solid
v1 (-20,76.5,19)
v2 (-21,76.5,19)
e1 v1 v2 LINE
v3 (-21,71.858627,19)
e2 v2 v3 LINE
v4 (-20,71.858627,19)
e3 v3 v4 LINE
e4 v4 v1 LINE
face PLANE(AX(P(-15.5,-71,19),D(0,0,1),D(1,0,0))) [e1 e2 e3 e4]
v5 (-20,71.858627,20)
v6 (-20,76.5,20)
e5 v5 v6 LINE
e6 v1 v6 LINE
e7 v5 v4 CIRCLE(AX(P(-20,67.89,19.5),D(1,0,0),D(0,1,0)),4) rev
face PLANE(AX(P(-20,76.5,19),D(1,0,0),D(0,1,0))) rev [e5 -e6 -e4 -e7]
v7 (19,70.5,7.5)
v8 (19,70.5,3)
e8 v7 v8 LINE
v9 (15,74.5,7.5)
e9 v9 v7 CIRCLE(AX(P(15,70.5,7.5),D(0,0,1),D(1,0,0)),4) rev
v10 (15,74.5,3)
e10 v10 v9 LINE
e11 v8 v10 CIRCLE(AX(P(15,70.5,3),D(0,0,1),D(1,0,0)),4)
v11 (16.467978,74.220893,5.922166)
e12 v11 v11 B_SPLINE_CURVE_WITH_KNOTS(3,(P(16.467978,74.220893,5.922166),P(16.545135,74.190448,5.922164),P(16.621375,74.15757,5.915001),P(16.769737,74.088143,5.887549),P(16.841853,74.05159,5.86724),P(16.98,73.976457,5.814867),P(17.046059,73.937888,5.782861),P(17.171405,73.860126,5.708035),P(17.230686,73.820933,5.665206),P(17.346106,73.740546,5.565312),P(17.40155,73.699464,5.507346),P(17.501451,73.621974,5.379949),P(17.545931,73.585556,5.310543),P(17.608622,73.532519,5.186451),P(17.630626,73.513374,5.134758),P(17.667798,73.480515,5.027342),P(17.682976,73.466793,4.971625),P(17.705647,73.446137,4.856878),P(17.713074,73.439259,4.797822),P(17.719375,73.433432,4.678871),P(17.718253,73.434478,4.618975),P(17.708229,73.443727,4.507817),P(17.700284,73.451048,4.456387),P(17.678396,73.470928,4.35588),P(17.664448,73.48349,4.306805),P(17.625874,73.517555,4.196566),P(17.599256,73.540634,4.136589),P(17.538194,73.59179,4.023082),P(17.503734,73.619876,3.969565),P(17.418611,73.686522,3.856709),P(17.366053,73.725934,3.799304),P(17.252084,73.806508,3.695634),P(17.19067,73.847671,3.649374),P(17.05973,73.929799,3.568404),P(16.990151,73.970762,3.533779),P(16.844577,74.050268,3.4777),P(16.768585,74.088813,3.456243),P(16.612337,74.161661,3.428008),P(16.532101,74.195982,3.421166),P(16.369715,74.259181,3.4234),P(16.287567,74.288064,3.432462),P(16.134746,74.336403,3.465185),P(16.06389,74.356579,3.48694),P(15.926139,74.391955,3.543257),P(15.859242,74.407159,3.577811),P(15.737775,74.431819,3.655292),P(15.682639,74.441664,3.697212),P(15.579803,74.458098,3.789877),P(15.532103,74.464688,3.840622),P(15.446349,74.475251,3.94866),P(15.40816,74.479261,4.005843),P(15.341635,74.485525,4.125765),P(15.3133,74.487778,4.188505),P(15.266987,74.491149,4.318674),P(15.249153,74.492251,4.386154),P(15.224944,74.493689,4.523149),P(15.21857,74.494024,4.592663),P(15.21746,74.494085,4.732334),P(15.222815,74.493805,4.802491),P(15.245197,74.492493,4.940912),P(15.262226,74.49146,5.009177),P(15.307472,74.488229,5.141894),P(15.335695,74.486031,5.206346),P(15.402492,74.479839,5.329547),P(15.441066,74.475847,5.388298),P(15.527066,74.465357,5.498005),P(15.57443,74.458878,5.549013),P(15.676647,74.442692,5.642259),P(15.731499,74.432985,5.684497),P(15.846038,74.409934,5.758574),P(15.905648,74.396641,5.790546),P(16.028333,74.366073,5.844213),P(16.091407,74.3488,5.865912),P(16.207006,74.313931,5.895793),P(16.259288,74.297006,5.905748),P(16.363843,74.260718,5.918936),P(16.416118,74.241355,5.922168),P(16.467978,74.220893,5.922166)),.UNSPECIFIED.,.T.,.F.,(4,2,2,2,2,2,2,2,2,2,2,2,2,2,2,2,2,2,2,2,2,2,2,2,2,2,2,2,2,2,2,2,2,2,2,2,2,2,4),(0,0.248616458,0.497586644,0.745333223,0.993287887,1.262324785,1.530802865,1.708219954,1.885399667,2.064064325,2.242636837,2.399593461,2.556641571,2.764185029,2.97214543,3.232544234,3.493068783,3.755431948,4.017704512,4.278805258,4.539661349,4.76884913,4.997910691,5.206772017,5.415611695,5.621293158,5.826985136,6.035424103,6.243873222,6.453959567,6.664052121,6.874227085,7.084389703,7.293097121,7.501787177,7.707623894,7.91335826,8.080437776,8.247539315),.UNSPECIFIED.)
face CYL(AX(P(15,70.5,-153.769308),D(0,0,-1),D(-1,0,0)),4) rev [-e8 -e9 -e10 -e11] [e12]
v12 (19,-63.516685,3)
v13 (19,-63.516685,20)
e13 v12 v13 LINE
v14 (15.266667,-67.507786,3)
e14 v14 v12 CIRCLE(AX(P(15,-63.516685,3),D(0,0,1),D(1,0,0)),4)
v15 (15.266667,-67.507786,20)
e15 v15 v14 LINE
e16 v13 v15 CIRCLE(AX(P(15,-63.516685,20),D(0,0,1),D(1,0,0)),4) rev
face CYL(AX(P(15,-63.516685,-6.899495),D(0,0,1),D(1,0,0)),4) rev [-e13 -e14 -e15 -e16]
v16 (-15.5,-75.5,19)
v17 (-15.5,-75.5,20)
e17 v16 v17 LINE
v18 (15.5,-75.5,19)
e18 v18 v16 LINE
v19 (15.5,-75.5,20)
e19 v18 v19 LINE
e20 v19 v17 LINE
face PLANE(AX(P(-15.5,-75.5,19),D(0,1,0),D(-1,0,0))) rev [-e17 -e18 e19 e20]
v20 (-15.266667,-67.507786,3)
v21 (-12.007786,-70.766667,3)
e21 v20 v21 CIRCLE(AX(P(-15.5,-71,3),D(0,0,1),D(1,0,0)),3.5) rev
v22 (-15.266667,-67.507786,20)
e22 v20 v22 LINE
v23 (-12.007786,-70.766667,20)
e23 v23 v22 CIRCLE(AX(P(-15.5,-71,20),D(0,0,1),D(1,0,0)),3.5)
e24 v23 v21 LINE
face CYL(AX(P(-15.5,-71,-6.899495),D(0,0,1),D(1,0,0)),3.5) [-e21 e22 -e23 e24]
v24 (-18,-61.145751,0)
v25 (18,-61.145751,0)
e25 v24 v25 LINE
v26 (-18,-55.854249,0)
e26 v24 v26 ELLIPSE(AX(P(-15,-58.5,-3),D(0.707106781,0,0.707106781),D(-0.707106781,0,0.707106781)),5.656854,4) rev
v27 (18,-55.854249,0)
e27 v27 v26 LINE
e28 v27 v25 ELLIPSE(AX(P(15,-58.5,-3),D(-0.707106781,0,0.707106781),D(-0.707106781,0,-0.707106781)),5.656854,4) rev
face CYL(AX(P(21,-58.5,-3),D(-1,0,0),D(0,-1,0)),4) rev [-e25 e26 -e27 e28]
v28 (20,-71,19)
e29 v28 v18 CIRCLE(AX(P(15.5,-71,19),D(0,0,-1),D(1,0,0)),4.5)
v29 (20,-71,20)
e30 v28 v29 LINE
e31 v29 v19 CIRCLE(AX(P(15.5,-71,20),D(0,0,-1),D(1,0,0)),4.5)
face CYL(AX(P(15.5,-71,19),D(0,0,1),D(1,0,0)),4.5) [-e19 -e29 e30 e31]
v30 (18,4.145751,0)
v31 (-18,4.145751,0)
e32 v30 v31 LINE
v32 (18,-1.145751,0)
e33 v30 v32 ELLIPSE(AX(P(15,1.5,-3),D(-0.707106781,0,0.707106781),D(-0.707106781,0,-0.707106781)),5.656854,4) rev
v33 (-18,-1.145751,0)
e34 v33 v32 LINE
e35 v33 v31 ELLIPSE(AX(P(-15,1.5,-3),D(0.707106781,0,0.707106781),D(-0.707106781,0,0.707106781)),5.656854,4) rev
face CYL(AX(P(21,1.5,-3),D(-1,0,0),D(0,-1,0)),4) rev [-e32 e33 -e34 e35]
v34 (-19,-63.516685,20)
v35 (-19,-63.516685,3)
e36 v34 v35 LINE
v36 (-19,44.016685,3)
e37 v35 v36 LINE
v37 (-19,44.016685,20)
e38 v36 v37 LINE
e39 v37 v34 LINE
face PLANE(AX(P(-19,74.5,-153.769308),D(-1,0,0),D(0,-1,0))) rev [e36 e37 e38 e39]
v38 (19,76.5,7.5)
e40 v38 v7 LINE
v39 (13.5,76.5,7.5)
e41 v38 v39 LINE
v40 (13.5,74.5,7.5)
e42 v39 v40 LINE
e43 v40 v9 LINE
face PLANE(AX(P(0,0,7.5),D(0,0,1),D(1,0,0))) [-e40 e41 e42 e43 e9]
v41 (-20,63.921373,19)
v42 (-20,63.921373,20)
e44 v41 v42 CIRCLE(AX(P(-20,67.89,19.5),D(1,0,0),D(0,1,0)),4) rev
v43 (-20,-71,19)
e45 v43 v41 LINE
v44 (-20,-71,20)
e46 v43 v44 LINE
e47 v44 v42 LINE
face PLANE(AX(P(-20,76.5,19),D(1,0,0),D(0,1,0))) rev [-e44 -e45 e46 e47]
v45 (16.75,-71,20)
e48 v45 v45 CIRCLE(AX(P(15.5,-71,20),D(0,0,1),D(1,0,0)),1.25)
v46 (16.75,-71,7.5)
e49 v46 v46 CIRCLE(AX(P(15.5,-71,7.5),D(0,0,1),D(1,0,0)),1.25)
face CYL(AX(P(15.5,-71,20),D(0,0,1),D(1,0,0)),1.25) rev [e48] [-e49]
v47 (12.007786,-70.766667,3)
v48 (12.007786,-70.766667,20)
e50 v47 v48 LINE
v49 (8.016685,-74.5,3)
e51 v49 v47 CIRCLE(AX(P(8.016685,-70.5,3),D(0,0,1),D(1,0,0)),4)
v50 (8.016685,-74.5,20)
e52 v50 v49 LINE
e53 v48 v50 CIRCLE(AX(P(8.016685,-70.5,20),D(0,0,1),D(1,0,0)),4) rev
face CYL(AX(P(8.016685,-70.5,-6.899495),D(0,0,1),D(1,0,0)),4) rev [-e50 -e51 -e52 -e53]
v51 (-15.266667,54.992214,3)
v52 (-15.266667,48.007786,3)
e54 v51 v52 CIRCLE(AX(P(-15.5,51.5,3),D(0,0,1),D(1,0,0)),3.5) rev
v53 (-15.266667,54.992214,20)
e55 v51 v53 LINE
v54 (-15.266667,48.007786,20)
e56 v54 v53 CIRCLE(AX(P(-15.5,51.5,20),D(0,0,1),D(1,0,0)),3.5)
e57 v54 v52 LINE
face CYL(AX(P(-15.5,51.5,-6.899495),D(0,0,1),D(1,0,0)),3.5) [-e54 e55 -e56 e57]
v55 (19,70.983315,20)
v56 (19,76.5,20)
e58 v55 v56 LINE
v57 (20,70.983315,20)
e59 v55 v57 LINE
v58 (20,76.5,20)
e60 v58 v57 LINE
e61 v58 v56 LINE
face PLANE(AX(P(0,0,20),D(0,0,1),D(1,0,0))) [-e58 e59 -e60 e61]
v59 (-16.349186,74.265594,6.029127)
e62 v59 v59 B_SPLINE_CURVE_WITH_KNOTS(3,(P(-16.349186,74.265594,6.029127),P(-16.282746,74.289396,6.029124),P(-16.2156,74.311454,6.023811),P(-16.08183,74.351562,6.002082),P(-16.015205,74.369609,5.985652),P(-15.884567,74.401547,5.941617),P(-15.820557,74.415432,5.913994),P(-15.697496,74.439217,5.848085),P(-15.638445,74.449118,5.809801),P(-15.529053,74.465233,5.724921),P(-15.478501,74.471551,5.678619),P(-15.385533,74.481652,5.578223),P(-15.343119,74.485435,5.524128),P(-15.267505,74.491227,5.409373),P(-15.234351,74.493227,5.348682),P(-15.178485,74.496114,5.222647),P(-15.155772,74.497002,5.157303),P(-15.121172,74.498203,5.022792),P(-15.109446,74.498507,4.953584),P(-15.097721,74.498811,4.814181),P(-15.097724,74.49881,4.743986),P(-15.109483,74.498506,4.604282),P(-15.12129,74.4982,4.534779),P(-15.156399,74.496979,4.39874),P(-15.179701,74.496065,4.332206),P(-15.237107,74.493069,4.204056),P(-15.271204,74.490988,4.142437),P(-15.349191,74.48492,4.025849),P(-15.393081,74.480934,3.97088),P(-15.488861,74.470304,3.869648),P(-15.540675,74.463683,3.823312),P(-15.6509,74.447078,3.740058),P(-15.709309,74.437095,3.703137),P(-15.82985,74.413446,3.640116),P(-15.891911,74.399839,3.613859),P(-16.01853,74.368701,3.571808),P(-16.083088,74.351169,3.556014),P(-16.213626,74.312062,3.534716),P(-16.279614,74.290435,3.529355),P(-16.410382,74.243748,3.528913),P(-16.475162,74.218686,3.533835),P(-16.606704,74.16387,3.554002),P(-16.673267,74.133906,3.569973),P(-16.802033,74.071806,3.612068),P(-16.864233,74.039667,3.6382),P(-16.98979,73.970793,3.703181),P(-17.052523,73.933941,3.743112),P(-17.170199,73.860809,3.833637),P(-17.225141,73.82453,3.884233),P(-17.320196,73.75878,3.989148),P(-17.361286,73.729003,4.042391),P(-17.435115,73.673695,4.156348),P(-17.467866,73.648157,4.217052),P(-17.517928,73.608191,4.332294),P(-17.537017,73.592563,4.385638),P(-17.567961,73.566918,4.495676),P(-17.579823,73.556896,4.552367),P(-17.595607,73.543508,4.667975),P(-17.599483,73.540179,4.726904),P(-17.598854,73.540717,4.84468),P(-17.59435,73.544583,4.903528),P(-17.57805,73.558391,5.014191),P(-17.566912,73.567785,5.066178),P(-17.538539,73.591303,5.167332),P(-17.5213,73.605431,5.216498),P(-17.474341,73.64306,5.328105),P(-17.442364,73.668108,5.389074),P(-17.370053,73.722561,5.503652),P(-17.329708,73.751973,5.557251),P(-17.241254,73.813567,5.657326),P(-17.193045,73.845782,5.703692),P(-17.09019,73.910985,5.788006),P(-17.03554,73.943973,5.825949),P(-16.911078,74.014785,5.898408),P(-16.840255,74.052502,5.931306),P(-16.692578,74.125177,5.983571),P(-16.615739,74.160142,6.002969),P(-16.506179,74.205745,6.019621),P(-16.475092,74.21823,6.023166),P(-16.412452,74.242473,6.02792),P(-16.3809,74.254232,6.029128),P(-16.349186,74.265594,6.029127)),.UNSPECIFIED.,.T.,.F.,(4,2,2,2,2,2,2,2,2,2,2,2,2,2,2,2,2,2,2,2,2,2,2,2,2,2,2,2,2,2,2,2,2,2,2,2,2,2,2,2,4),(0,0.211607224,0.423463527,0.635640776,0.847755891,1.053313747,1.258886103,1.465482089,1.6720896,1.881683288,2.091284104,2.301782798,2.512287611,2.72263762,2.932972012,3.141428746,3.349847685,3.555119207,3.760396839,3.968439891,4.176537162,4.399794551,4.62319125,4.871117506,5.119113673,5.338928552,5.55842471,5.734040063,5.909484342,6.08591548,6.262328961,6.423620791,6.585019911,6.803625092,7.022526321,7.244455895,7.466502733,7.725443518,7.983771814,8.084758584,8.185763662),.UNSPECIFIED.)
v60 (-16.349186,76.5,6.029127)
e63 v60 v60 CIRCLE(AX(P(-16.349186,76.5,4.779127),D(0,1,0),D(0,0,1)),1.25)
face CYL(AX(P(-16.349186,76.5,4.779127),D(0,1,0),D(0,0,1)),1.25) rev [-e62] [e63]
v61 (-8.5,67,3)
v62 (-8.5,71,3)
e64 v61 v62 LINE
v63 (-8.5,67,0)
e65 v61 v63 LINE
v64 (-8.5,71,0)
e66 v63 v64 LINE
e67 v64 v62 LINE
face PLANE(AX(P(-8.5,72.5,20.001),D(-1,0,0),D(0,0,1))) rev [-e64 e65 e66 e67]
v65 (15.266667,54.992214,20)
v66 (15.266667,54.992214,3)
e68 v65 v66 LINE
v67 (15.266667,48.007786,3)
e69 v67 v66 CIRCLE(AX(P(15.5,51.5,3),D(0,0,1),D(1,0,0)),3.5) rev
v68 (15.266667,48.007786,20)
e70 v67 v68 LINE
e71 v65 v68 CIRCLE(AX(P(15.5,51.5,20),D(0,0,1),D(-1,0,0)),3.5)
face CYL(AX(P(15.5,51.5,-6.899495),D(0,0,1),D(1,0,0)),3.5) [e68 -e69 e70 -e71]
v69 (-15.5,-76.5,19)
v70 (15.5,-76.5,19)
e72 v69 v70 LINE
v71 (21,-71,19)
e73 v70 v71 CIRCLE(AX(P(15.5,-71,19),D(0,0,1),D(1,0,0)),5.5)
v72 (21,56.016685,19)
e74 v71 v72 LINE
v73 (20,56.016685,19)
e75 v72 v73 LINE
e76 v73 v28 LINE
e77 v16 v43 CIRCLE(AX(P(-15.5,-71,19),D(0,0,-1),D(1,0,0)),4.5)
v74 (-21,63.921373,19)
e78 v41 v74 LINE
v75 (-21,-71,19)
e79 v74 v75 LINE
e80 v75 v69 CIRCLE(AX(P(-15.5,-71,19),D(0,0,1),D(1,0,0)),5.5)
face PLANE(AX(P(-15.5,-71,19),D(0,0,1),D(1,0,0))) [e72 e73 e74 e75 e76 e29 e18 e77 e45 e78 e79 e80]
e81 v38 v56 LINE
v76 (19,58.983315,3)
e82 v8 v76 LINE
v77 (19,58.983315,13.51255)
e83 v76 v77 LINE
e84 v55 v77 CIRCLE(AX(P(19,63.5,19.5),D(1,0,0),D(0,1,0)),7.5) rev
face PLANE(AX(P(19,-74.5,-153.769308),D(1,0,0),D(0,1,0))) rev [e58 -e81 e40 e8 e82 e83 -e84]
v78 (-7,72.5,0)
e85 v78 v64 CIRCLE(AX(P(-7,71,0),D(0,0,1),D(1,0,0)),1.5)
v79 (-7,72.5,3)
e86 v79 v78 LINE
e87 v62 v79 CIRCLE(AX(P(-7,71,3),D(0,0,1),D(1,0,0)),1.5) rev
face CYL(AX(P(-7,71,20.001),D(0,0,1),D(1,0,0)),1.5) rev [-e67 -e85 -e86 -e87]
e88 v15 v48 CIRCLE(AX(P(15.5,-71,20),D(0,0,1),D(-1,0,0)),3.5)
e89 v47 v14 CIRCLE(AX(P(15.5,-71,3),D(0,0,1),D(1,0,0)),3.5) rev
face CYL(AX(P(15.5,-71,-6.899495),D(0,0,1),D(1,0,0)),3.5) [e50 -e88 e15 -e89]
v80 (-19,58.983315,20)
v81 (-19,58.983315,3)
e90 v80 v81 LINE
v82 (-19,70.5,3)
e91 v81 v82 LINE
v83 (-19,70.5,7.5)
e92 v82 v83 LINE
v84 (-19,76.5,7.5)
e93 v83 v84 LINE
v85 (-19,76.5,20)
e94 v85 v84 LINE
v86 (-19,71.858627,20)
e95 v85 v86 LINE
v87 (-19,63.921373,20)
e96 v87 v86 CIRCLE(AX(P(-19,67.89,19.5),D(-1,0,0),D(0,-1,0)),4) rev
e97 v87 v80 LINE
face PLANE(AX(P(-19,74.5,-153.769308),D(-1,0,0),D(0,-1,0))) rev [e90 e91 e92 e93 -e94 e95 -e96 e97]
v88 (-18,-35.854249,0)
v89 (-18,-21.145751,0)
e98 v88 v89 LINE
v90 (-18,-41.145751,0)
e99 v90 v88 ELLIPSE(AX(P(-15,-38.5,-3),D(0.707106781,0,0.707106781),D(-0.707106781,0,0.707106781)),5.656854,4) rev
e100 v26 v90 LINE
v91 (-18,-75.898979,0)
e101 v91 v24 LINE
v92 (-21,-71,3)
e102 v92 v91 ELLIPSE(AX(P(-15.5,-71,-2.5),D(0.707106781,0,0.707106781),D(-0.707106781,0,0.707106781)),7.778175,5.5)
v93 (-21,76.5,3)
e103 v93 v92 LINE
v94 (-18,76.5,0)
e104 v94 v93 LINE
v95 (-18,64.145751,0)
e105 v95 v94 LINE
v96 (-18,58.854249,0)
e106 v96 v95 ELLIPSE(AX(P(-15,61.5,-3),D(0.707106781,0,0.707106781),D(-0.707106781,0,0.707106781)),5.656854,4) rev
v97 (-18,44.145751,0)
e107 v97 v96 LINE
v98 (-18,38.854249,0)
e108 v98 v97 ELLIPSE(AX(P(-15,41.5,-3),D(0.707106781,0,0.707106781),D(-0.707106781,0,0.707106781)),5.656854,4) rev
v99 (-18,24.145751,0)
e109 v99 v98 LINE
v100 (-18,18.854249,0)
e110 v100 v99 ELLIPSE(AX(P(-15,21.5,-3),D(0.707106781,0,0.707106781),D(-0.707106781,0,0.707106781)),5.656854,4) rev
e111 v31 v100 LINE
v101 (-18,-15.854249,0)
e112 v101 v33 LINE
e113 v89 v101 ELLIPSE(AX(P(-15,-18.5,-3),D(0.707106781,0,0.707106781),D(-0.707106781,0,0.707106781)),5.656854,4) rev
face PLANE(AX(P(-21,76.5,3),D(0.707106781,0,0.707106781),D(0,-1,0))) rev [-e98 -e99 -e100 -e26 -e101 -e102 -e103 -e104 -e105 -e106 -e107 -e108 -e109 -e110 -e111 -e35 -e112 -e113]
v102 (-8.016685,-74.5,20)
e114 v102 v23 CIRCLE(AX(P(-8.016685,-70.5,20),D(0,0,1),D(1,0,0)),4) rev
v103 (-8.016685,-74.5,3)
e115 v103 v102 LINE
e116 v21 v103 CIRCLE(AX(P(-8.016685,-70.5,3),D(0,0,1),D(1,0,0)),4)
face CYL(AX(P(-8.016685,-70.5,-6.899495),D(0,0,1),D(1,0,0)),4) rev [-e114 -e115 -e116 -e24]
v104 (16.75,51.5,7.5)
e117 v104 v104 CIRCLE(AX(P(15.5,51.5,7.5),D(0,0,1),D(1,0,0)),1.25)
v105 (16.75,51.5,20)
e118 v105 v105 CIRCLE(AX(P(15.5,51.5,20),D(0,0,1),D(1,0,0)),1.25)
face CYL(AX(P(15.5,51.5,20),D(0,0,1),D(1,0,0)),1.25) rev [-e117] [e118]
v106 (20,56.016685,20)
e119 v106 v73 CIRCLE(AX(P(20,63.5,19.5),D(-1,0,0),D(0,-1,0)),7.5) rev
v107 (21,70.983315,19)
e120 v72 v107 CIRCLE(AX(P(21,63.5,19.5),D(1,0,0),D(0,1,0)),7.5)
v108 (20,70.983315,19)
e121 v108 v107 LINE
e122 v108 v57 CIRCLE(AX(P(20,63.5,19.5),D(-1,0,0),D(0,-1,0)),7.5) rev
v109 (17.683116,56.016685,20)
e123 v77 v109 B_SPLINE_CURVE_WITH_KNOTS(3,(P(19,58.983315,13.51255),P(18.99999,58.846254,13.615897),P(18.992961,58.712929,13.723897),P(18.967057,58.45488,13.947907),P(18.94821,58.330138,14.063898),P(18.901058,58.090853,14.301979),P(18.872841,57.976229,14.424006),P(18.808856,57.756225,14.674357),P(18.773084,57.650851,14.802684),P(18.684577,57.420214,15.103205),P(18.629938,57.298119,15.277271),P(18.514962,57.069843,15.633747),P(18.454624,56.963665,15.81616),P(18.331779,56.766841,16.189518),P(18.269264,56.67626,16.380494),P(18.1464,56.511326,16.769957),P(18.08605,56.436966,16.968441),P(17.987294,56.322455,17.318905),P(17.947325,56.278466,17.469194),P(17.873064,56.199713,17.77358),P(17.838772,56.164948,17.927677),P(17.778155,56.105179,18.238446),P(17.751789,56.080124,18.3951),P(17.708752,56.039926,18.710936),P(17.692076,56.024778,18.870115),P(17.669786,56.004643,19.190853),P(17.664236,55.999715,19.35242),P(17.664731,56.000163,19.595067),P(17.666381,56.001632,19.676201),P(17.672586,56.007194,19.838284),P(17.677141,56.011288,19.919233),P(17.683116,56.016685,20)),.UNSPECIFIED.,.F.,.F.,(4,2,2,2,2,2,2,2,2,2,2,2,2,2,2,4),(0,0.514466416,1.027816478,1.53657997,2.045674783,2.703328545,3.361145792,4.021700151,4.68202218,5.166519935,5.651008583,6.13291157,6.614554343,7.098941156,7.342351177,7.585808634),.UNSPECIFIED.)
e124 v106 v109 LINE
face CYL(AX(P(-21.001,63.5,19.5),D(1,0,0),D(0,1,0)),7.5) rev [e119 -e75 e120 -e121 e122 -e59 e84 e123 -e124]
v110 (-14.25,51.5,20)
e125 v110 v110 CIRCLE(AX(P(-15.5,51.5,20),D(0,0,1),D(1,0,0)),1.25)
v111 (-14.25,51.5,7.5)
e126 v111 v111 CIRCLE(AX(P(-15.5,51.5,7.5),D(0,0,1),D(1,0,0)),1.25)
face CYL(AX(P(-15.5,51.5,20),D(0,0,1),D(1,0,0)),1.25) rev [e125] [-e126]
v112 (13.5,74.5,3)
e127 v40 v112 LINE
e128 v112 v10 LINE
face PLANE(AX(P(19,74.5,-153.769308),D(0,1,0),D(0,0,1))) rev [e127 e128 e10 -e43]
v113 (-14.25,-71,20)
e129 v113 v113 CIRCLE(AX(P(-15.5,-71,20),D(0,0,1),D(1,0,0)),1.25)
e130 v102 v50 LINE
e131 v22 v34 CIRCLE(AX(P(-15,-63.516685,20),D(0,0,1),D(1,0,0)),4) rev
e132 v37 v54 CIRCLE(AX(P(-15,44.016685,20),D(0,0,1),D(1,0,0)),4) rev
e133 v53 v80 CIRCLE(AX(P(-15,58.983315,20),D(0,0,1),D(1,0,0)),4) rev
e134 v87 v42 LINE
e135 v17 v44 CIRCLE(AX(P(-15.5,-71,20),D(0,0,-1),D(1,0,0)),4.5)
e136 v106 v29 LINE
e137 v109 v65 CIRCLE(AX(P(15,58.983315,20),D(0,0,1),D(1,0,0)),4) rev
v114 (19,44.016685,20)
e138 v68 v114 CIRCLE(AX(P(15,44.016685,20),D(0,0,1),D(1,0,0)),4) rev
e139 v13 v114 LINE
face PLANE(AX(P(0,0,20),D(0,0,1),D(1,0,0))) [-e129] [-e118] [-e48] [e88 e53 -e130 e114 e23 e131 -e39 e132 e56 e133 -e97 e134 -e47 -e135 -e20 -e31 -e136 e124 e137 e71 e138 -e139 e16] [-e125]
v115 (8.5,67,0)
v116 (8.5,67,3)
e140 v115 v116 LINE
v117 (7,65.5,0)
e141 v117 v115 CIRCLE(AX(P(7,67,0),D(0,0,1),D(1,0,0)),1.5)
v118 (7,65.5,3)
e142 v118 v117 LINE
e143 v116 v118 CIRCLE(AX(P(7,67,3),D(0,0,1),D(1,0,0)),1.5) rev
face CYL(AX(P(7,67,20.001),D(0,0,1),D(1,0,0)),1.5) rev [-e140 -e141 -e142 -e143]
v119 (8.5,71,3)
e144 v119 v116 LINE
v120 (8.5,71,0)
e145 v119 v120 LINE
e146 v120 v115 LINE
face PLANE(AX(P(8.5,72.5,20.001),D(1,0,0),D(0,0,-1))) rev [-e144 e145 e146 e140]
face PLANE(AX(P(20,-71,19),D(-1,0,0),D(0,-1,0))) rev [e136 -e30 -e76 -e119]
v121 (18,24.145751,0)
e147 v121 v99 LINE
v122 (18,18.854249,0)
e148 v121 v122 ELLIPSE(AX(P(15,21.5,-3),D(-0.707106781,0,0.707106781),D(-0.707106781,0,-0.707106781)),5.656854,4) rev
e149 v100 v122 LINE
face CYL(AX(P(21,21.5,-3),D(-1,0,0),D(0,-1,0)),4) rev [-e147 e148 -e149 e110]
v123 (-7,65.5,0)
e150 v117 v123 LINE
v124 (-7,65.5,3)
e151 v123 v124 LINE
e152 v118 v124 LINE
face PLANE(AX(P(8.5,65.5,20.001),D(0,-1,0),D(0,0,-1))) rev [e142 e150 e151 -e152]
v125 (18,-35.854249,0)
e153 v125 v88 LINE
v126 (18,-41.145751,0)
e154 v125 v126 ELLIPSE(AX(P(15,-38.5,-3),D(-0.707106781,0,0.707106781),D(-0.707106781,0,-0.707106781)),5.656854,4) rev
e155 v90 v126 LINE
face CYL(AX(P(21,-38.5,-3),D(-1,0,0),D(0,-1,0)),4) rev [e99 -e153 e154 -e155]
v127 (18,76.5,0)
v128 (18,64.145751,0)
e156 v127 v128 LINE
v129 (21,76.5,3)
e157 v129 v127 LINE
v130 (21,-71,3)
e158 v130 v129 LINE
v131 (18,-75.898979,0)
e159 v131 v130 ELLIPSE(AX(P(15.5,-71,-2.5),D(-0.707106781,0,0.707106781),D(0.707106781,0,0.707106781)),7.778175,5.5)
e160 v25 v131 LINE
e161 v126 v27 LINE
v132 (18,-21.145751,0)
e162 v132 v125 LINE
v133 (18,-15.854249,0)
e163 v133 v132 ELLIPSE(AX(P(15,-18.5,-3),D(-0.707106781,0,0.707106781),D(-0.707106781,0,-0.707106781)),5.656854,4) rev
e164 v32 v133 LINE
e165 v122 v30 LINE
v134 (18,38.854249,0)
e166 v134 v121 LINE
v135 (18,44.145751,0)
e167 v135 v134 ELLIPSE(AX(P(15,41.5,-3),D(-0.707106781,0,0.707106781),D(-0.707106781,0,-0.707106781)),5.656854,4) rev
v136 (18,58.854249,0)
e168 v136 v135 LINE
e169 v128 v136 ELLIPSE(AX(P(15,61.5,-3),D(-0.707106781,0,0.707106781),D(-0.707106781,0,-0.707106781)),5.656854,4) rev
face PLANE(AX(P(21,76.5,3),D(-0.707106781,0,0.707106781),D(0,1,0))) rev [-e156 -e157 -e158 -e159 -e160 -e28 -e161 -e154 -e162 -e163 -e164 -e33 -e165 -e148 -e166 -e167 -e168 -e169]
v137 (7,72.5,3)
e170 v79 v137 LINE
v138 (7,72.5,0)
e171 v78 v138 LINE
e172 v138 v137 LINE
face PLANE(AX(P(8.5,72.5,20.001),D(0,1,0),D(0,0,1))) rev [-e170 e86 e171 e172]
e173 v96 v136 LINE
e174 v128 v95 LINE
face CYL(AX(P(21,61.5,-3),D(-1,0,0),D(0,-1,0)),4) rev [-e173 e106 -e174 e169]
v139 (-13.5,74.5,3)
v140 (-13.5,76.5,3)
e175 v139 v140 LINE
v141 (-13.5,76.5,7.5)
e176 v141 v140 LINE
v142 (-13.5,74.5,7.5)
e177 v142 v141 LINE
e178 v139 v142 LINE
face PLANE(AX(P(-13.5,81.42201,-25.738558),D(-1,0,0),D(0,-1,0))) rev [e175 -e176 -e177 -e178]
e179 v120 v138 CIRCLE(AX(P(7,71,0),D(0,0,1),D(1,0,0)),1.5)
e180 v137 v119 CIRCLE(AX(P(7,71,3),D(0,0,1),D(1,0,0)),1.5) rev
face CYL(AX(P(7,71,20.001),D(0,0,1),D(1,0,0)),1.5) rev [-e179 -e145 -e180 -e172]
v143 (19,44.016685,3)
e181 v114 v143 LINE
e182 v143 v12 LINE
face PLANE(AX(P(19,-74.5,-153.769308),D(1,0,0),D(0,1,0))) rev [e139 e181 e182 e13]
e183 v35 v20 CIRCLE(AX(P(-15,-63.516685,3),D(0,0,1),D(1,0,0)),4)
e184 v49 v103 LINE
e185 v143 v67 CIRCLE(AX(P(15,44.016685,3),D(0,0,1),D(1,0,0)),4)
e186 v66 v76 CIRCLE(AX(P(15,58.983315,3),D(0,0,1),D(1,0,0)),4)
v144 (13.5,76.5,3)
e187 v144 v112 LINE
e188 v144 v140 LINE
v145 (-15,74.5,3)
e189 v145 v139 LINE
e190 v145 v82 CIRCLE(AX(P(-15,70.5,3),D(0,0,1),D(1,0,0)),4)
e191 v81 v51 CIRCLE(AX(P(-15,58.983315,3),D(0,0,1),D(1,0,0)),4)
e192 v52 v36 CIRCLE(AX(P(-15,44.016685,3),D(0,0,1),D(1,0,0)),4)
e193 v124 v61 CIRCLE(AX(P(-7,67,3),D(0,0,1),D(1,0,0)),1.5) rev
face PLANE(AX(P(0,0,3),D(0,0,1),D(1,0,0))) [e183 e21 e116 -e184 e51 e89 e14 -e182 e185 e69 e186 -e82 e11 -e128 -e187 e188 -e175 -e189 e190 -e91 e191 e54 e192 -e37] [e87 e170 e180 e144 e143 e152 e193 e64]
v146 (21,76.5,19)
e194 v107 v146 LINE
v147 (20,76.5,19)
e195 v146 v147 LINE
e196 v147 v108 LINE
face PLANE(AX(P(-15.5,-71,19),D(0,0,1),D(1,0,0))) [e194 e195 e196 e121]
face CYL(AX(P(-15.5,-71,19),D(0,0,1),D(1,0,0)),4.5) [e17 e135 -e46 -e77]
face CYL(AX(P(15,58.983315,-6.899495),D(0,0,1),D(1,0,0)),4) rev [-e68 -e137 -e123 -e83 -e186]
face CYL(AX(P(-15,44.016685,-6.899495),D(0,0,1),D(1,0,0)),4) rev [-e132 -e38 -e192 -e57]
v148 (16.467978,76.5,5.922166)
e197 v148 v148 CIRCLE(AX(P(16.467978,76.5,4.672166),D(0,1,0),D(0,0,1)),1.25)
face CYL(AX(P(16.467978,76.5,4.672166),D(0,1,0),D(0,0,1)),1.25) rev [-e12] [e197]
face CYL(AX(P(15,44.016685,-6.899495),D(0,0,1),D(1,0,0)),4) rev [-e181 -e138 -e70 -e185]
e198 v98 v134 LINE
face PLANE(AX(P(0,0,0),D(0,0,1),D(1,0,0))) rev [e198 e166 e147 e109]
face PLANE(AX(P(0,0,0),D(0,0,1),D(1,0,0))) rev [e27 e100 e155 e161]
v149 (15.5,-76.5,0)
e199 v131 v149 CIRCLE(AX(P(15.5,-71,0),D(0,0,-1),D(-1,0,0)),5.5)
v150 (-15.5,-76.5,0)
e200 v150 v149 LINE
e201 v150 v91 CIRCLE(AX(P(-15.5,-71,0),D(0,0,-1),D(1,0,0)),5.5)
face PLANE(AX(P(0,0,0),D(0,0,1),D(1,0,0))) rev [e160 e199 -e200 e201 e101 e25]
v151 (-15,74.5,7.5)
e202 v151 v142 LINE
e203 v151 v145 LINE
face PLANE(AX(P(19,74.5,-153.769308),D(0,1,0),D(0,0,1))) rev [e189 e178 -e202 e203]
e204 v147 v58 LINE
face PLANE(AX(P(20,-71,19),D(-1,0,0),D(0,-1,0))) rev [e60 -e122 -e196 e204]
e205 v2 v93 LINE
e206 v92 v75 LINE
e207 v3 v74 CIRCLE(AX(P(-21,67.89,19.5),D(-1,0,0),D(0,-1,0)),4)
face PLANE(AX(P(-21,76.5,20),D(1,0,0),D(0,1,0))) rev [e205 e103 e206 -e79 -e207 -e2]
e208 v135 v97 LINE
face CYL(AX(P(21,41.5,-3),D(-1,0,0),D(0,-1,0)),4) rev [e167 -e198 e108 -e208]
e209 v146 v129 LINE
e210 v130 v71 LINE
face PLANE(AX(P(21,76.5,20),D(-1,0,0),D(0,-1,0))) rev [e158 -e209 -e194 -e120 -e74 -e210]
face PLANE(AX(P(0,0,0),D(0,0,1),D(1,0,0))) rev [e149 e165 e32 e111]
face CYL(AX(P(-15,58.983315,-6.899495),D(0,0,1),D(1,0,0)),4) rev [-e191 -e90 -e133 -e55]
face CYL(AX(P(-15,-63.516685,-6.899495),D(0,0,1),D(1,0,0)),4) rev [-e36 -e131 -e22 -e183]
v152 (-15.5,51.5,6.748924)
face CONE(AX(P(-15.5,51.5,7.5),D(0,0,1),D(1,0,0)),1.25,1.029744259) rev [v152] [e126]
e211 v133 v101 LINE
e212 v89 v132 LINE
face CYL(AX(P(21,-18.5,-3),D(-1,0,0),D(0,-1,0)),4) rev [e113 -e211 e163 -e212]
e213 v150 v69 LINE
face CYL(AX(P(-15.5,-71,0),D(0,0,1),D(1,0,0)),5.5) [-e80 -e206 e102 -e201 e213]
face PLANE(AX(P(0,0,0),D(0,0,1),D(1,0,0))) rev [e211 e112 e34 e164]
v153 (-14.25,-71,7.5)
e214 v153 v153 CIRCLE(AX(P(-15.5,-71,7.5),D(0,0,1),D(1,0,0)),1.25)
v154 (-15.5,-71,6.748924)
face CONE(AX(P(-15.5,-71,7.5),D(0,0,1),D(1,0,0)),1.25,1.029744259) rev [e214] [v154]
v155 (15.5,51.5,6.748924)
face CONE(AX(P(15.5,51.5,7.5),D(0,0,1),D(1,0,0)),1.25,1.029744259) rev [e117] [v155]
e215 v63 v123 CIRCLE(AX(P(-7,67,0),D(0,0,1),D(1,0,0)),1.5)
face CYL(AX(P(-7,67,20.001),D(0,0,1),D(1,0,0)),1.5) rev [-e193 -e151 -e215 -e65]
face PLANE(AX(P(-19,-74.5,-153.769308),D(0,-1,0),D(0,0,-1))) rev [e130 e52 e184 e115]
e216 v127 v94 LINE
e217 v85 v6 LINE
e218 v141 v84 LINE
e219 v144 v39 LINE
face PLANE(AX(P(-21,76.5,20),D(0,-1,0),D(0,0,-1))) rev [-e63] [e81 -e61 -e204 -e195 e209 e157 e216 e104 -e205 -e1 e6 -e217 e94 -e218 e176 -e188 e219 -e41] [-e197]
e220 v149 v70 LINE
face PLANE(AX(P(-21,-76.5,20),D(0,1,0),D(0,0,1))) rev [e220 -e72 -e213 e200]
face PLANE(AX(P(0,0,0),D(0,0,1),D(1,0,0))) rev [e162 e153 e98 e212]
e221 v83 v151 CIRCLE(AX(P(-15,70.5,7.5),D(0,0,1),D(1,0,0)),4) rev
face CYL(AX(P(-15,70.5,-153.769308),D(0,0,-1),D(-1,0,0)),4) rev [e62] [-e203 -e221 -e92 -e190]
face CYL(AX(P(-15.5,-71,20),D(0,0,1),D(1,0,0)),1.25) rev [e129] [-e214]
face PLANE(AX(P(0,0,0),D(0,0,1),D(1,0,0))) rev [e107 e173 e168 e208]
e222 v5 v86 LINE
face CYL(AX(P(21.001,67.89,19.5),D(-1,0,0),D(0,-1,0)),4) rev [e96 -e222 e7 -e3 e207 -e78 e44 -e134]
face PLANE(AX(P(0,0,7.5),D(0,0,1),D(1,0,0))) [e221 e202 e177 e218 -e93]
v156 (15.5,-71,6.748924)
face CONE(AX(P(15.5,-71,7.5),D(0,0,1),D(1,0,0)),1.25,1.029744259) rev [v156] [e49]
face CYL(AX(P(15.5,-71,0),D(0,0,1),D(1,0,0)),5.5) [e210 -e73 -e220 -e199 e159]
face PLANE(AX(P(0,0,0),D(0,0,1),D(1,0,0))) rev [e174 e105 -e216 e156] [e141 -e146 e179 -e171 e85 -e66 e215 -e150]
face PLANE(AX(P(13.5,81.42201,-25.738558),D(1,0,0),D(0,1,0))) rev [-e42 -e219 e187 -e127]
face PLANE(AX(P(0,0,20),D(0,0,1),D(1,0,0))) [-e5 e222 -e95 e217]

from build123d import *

# Parameters (mm, degrees)
SKETCH_1_W           = 42
SKETCH_1_H           = 153
EXTRUDE_1_DEPTH      = 20
SKETCH_2_W           = 38
SKETCH_2_H           = 149
CUT_EXTRUDE_1_DEPTH  = 17
EXTRUDE_3_DEPTH      = 17
FILLET_START         = 2
FILLET_2_DEPTH       = 18
CHAMFER_1_SIZE       = 3
CUT_EXTRUDE_3_DEPTH  = 82.812285141
SKETCH_8_R           = 4
CUT_EXTRUDE_4_DEPTH  = 90.533513279
SKETCH_13_W          = 27
SKETCH_13_H          = 9.8440201
CUT_EXTRUDE_6_DEPTH  = 17
SKETCH_14_W          = 38
SKETCH_14_H          = 15.071373518
CUT_EXTRUDE_7_DEPTH  = 12.5
CUT_EXTRUDE_8_DEPTH  = 1
M3X0_51_D            = 2.5
M3X0_51_DEPTH        = 12.5
M3X0_51_TIP          = 0.751075774
M3X0_52_D            = 2.5
M3X0_52_DEPTH        = 12.5
M3X0_52_TIP          = 0.751075774
CUT_EXTRUDE_9_REACH  = 91.534
SKETCH_22_R          = 7.5
CUT_EXTRUDE_10_REACH = 91.534
SKETCH_23_R          = 4
CUT_EXTRUDE_11_REACH = 83.812
SKETCH_24_W          = 17
SKETCH_24_H          = 7
FILLET_3_R           = 1.5


with BuildPart() as part:
    # Эскиз1 → Бобышка-Вытянуть1 (new body)
    with BuildSketch(Plane.XY):
        Rectangle(SKETCH_1_W, SKETCH_1_H)
    extrude(amount=EXTRUDE_1_DEPTH)

    # Эскиз2 → Вырез-Вытянуть1 (cut)
    with BuildSketch(Plane.XY.offset(20)):
        Rectangle(SKETCH_2_W, SKETCH_2_H)
    extrude(amount=-CUT_EXTRUDE_1_DEPTH, mode=Mode.SUBTRACT)

    # Эскиз3 → Бобышка-Вытянуть3 (add)
    with BuildSketch(Plane.XY.offset(20)):
        with BuildLine():
            Line((-19, -71), (-19, -74.5))
            Line((-19, -74.5), (-15.5, -74.5))
            ThreePointArc((-15.5, -74.5), (-13.025126266, -68.525126266), (-19, -71))
        make_face()
        with BuildLine():
            Line((19, -71), (19, -74.5))
            Line((19, -74.5), (15.5, -74.5))
            ThreePointArc((15.5, -74.5), (13.025126266, -68.525126266), (19, -71))
        make_face()
        with BuildLine():
            Line((-15.5, 55), (-19, 55))
            Line((-19, 55), (-19, 48))
            Line((-19, 48), (-15.5, 48))
            ThreePointArc((-15.5, 48), (-12, 51.5), (-15.5, 55))
        make_face()
        with BuildLine():
            Line((15.5, 55), (19, 55))
            Line((19, 55), (19, 48))
            Line((19, 48), (15.5, 48))
            ThreePointArc((15.5, 48), (12, 51.5), (15.5, 55))
        make_face()
    extrude(amount=-EXTRUDE_3_DEPTH)

    # Скругление2: read off the stored shape, not the designer's step
    # Скругление2 outline → Скругление2 (add)
    with BuildSketch(Plane.XY.offset(FILLET_START)):
        with BuildLine():
            ThreePointArc((19, 58.983314774), (17.921186974, 56.25079457), (15.266666667, 54.992213561))
            ThreePointArc((15.266666667, 54.992213561), (15.383268392, 54.998052849), (15.5, 55))
            Line((15.5, 55), (19, 55))
            Line((19, 55), (19, 58.983314774))
        make_face()
        with BuildLine():
            ThreePointArc((15.5, 48), (15.383268392, 48.001947151), (15.266666667, 48.007786439))
            ThreePointArc((15.266666667, 48.007786439), (17.921186974, 46.74920543), (19, 44.016685226))
            Line((19, 44.016685226), (19, 48))
            Line((19, 48), (15.5, 48))
        make_face()
        with BuildLine():
            ThreePointArc((15, 74.5), (17.828427125, 73.328427125), (19, 70.5))
            Line((19, 70.5), (19, 74.5))
            Line((19, 74.5), (15, 74.5))
        make_face()
        with BuildLine():
            Line((19, -71), (19, -63.516685226))
            ThreePointArc((19, -63.516685226), (17.921186974, -66.24920543), (15.266666667, -67.507786439))
            ThreePointArc((15.266666667, -67.507786439), (17.890955179, -68.443961399), (19, -71))
        make_face()
        with BuildLine():
            ThreePointArc((-19, 70.5), (-17.828427125, 73.328427125), (-15, 74.5))
            Line((-15, 74.5), (-19, 74.5))
            Line((-19, 74.5), (-19, 70.5))
        make_face()
        with BuildLine():
            ThreePointArc((15.5, -74.5), (12.943961399, -73.390955179), (12.007786439, -70.766666667))
            ThreePointArc((12.007786439, -70.766666667), (10.74920543, -73.421186974), (8.016685226, -74.5))
            Line((8.016685226, -74.5), (15.5, -74.5))
        make_face()
        with BuildLine():
            ThreePointArc((-15.266666667, 54.992213561), (-17.921186974, 56.25079457), (-19, 58.983314774))
            Line((-19, 58.983314774), (-19, 55))
            Line((-19, 55), (-15.5, 55))
            ThreePointArc((-15.5, 55), (-15.383268392, 54.998052849), (-15.266666667, 54.992213561))
        make_face()
        with BuildLine():
            Line((-15.5, -74.5), (-8.016685226, -74.5))
            ThreePointArc((-8.016685226, -74.5), (-10.74920543, -73.421186974), (-12.007786439, -70.766666667))
            ThreePointArc((-12.007786439, -70.766666667), (-12.943961399, -73.390955179), (-15.5, -74.5))
        make_face()
        with BuildLine():
            ThreePointArc((-19, 44.016685226), (-17.921186974, 46.74920543), (-15.266666667, 48.007786439))
            ThreePointArc((-15.266666667, 48.007786439), (-15.383268392, 48.001947151), (-15.5, 48))
            Line((-15.5, 48), (-19, 48))
            Line((-19, 48), (-19, 44.016685226))
        make_face()
        with BuildLine():
            ThreePointArc((-19, -71), (-17.890955179, -68.443961399), (-15.266666667, -67.507786439))
            ThreePointArc((-15.266666667, -67.507786439), (-17.921186974, -66.24920543), (-19, -63.516685226))
            Line((-19, -63.516685226), (-19, -71))
        make_face()
    extrude(amount=FILLET_2_DEPTH)

    # Фаска1
    chamfer_1_edges = [part.edges().sort_by_distance(p)[0] for p in [
        (-21, 0, 0),
        (21, 0, 0),
    ]]
    chamfer(chamfer_1_edges, length=CHAMFER_1_SIZE)

    # Эскиз7 → Вырез-Вытянуть3 (cut, through all)
    with BuildSketch(Plane.XY.offset(20)):
        with BuildLine():
            Line((-21, -71), (-21, -76.5))
            Line((-21, -76.5), (-15.5, -76.5))
            ThreePointArc((-15.5, -76.5), (-19.389087297, -74.889087297), (-21, -71))
        make_face()
        with BuildLine():
            Line((21, -76.5), (15.5, -76.5))
            ThreePointArc((15.5, -76.5), (19.389087297, -74.889087297), (21, -71))
            Line((21, -71), (21, -76.5))
        make_face()
    extrude(amount=-CUT_EXTRUDE_3_DEPTH, mode=Mode.SUBTRACT)

    # Эскиз8 → Вырез-Вытянуть4 (cut, through all)
    with BuildSketch(Plane.ZY.offset(21)):
        with Locations((-3, -58.5)):
            Circle(SKETCH_8_R)
        with Locations((-3, -38.5)):
            Circle(SKETCH_8_R)
        with Locations((-3, -18.5)):
            Circle(SKETCH_8_R)
        with Locations((-3, 1.5)):
            Circle(SKETCH_8_R)
        with Locations((-3, 21.5)):
            Circle(SKETCH_8_R)
        with Locations((-3, 41.5)):
            Circle(SKETCH_8_R)
        with Locations((-3, 61.5)):
            Circle(SKETCH_8_R)
    extrude(amount=-CUT_EXTRUDE_4_DEPTH, mode=Mode.SUBTRACT)

    # Эскиз13 → Вырез-Вытянуть6 (cut)
    with BuildSketch(Plane.XY.offset(20)):
        with Locations((0, 76.5)):
            Rectangle(SKETCH_13_W, SKETCH_13_H)
    extrude(amount=-CUT_EXTRUDE_6_DEPTH, mode=Mode.SUBTRACT)

    # Эскиз14 → Вырез-Вытянуть7 (cut)
    with BuildSketch(Plane.XY.offset(20)):
        with Locations((0, 76.5)):
            Rectangle(SKETCH_14_W, SKETCH_14_H)
    extrude(amount=-CUT_EXTRUDE_7_DEPTH, mode=Mode.SUBTRACT)

    # Эскиз15 → Вырез-Вытянуть8 (cut)
    with BuildSketch(Plane.XY.offset(20)):
        with BuildLine():
            Line((-21, 76.5), (-21, -71))
            ThreePointArc((-21, -71), (-19.389087297, -74.889087297), (-15.5, -76.5))
            Line((-15.5, -76.5), (15.5, -76.5))
            ThreePointArc((15.5, -76.5), (19.389087297, -74.889087297), (21, -71))
            Line((21, -71), (21, 76.5))
            Line((21, 76.5), (20, 76.5))
            Line((20, 76.5), (20, -71))
            ThreePointArc((20, -71), (18.681980515, -74.181980515), (15.5, -75.5))
            Line((15.5, -75.5), (-15.5, -75.5))
            ThreePointArc((-15.5, -75.5), (-18.681980515, -74.181980515), (-20, -71))
            Line((-20, -71), (-20, 76.5))
            Line((-20, 76.5), (-21, 76.5))
        make_face()
    extrude(amount=-CUT_EXTRUDE_8_DEPTH, mode=Mode.SUBTRACT)

    # Отверстие обработанное метчиком M3x0.51
    with Locations(Plane.XY.offset(20)):
        with Locations((-15.5, 51.5), (15.5, 51.5), (15.5, -71), (-15.5, -71)):
            Hole(M3X0_51_D / 2, depth=M3X0_51_DEPTH)
            with Locations((0, 0, -(M3X0_51_DEPTH + M3X0_51_TIP / 2))):  # 118° drill point
                Cone(0, M3X0_51_D / 2, M3X0_51_TIP, mode=Mode.SUBTRACT)

    # Отверстие обработанное метчиком M3x0.52
    with Locations(Plane(origin=(0, 76.5, 0), x_dir=(1, 0, 0), z_dir=(0, 1, 0))):
        with Locations((-16.349186161, -4.77912666), (16.467977598, -4.67216637)):
            Hole(M3X0_52_D / 2, depth=M3X0_52_DEPTH)
            with Locations((0, 0, -(M3X0_52_DEPTH + M3X0_52_TIP / 2))):  # 118° drill point
                Cone(0, M3X0_52_D / 2, M3X0_52_TIP, mode=Mode.SUBTRACT)

    # Эскиз22 → Вырез-Вытянуть9 (cut, up to next)
    with BuildSketch(Plane(origin=(21, 0, 0), x_dir=(0, 0, -1), z_dir=(1, 0, 0)), mode=Mode.PRIVATE) as cut_extrude_9_sk1:
        with Locations((-19.5, 63.5)):
            Circle(SKETCH_22_R)
    cut_extrude_9_tool1 = extrude(cut_extrude_9_sk1.sketch, amount=-CUT_EXTRUDE_9_REACH, mode=Mode.PRIVATE) & part.part
    add(cut_extrude_9_tool1.solids().sort_by_distance((21, 63.5, 19.5))[0], mode=Mode.SUBTRACT)

    # Эскиз23 → Вырез-Вытянуть10 (cut, up to next)
    with BuildSketch(Plane.ZY.offset(21), mode=Mode.PRIVATE) as cut_extrude_10_sk1:
        with Locations((19.5, 67.89)):
            Circle(SKETCH_23_R)
    cut_extrude_10_tool1 = extrude(cut_extrude_10_sk1.sketch, amount=-CUT_EXTRUDE_10_REACH, mode=Mode.PRIVATE) & part.part
    add(cut_extrude_10_tool1.solids().sort_by_distance((-21, 67.89, 19.5))[0], mode=Mode.SUBTRACT)

    # Эскиз24 → Вырез-Вытянуть11 (cut, up to next)
    with BuildSketch(Plane(origin=(0, 0, 0), x_dir=(-1, 0, 0), z_dir=(0, 0, -1)), mode=Mode.PRIVATE) as cut_extrude_11_sk1:
        with Locations((0, 69)):
            Rectangle(SKETCH_24_W, SKETCH_24_H)
    cut_extrude_11_tool1 = extrude(cut_extrude_11_sk1.sketch, amount=-CUT_EXTRUDE_11_REACH, mode=Mode.PRIVATE) & part.part
    add(cut_extrude_11_tool1.solids().sort_by_distance((0, 69, 0))[0], mode=Mode.SUBTRACT)

    # Скругление3
    fillet_3_edges = [part.edges().sort_by_distance(p)[0] for p in [
        (-8.5, 72.5, 1.5),
        (-8.5, 65.5, 1.5),
        (8.5, 65.5, 1.5),
        (8.5, 72.5, 1.5),
    ]]
    fillet(fillet_3_edges, radius=FILLET_3_R)


solid = part.part
